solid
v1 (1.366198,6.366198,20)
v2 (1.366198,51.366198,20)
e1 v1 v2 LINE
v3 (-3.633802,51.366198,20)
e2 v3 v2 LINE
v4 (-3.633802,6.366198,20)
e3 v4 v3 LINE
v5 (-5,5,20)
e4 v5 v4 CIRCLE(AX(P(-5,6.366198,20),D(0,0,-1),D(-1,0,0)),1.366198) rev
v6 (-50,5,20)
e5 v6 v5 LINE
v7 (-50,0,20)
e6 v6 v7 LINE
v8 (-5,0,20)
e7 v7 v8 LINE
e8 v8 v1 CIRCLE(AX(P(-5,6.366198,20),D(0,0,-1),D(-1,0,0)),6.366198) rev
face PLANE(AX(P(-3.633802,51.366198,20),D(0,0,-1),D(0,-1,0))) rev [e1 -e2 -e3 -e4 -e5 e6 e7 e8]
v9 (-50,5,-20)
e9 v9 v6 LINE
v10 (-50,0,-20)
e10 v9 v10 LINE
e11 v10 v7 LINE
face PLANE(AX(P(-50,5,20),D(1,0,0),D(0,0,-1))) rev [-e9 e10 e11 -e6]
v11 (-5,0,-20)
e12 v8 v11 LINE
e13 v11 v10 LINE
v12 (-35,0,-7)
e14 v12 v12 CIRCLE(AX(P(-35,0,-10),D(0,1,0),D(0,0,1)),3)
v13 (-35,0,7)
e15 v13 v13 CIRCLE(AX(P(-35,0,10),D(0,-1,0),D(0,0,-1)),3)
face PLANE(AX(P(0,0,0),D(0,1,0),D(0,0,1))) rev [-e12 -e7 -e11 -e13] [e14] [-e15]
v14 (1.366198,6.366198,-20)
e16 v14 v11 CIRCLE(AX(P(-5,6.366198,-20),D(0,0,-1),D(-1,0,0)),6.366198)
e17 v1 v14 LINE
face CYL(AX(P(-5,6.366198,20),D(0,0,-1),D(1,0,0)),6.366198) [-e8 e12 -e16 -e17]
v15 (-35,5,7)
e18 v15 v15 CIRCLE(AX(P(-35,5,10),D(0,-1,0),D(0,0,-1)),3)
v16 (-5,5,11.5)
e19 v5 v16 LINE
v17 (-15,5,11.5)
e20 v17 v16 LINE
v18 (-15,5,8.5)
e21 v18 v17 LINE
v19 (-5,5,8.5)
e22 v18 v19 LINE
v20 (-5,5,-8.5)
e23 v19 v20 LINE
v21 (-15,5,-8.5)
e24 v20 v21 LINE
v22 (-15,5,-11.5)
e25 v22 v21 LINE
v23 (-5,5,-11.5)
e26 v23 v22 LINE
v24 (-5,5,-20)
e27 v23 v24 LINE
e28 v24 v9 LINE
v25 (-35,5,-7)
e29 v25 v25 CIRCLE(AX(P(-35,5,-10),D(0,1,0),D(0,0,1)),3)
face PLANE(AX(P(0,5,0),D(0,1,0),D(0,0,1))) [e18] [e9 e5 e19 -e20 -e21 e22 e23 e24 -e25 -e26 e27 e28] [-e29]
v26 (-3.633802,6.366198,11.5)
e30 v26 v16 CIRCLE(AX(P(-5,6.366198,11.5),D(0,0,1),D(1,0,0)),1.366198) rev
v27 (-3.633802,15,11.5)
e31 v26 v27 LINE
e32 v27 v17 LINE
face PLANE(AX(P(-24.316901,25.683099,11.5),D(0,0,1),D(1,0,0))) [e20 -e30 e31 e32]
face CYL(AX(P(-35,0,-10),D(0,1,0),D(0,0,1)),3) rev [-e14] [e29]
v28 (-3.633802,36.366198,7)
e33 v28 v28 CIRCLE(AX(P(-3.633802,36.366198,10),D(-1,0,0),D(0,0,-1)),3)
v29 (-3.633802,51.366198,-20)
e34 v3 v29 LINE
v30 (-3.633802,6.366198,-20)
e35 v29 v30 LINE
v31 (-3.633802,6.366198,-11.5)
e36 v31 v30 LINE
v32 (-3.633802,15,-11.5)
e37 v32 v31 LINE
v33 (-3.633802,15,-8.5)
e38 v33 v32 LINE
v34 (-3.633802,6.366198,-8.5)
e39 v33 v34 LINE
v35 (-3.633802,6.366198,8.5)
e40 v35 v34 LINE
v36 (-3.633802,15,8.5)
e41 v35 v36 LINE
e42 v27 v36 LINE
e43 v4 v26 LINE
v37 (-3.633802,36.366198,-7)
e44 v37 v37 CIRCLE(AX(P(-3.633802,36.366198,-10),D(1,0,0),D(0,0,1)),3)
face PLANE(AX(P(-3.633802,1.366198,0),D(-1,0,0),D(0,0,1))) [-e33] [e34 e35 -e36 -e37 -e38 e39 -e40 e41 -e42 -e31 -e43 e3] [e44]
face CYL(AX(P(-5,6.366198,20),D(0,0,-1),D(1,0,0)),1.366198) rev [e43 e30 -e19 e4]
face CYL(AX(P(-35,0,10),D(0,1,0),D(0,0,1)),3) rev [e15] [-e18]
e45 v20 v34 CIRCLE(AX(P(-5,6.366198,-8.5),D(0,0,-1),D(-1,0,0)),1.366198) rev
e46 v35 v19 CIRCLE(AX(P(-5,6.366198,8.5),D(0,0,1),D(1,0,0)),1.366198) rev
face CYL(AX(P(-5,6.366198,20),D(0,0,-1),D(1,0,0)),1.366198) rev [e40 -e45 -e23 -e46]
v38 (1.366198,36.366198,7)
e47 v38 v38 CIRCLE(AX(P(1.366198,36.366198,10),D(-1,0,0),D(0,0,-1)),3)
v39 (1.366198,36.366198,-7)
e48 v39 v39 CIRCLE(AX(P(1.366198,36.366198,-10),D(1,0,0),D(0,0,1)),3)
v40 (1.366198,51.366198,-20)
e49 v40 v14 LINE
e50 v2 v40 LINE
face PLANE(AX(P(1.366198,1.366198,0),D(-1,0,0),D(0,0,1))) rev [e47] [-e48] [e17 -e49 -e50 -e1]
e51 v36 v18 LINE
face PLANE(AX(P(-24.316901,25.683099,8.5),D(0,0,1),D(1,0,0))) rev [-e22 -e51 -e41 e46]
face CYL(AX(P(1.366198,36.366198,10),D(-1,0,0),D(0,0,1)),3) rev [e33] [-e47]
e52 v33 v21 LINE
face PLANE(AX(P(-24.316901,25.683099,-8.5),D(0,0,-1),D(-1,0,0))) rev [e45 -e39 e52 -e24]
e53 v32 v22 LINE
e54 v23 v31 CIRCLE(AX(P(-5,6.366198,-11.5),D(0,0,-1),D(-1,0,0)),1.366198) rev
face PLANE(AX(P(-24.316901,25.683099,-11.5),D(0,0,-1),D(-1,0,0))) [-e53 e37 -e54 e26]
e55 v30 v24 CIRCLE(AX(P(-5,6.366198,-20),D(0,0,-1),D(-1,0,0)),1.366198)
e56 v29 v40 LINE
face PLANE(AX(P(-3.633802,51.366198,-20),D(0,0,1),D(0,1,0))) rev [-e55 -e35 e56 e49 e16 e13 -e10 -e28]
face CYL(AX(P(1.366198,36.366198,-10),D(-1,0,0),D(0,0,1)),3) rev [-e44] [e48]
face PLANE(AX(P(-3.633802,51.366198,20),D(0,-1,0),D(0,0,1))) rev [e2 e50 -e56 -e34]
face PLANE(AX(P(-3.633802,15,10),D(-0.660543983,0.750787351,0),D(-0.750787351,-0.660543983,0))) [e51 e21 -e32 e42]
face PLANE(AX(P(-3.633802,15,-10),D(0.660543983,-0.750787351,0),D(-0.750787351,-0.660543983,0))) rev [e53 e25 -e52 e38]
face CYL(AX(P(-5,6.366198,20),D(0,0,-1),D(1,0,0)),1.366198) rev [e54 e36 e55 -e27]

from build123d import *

# Parameters (mm, degrees)
SKETCH1_W                                  = 100
SKETCH1_H                                  = 40
BOSS_EXTRUDE1_DEPTH                        = 5
SKETCH2_R                                  = 3
CUT_EXTRUDE1_DEPTH                         = 55.083269132
MIRROR1_AT_THE_SECOND_PLANE_COPY_1_SKETC_R = 3
MIRROR1_AT_THE_SECOND_PLANE_COPY_1_DEPTH   = 55.083269132
FLEX1_START                                = 1.366197724
FLEX1_OUTLINE_W                            = 5
FLEX1_OUTLINE_H                            = 40
FLEX1_DEPTH                                = 48.633802276
FLEX1_START_2                              = -3.633802276
FLEX1_2_OUTLINE_W                          = 46.366197724
FLEX1_2_OUTLINE_H                          = 40
FLEX1_2_OUTLINE_R                          = 3
FLEX1_2_DEPTH                              = 3.907802276
FLEX1_START_3                              = -5
FLEX1_3_OUTLINE_W                          = 46.366197724
FLEX1_3_OUTLINE_H                          = 40
FLEX1_3_OUTLINE_R                          = 3
FLEX1_3_DEPTH                              = 6.366197724
FLEX1_START_4                              = -20
FLEX1_4_DEPTH                              = 40
RIB1_REACH                                 = 79.708
SKETCH3_WALL_W                             = 172.55443254
SKETCH3_WALL_H                             = 3


with BuildPart() as part:
    # Sketch1 → Boss-Extrude1 (new body)
    with BuildSketch(Plane(origin=(0, 0, 0), x_dir=(1, 0, 0), z_dir=(0, 1, 0))):
        Rectangle(SKETCH1_W, SKETCH1_H)
    extrude(amount=BOSS_EXTRUDE1_DEPTH)

    # Sketch2 → Cut-Extrude1 (cut, through all)
    with BuildSketch(Plane(origin=(0, 5, 0), x_dir=(1, 0, 0), z_dir=(0, 1, 0))):
        with Locations(Location((-35, 10, 0), (0, 0, 270))):
            Circle(SKETCH2_R)
    cut_extrude1 = extrude(amount=-CUT_EXTRUDE1_DEPTH, mode=Mode.SUBTRACT)

    # Mirror1: Cut-Extrude1 across plane
    add(cut_extrude1.mirror(Plane.XY), mode=Mode.SUBTRACT)

    # Mirror1 at the second plane: Cut-Extrude1 across plane
    add(cut_extrude1.mirror(Plane(origin=(0, 0, 0), x_dir=(0, 0, 1), z_dir=(1, 0, 0))), mode=Mode.SUBTRACT)

    # Mirror1 at the second plane copy 1 sketc → Mirror1 at the second plane copy 1 (cut, through all)
    with BuildSketch(Plane(origin=(0, 5, 0), x_dir=(-1, 0, 0), z_dir=(0, 1, 0))):
        with Locations(Location((-35, 10, 0), (0, 0, 270))):
            Circle(MIRROR1_AT_THE_SECOND_PLANE_COPY_1_SKETC_R)
    extrude(amount=-MIRROR1_AT_THE_SECOND_PLANE_COPY_1_DEPTH, mode=Mode.SUBTRACT)

    # Flex1: read off the stored shape, not the designer's step
    # Flex1 outline → Flex1 (cut)
    with BuildSketch(Plane.YZ.offset(FLEX1_START)):
        with Locations((2.5, 0)):
            Rectangle(FLEX1_OUTLINE_W, FLEX1_OUTLINE_H)
    extrude(amount=FLEX1_DEPTH, mode=Mode.SUBTRACT)

    # Flex1 2 outline → Flex1 2 (add)
    with BuildSketch(Plane.YZ.offset(FLEX1_START_2)):
        with Locations((28.183098862, 0)):
            Rectangle(FLEX1_2_OUTLINE_W, FLEX1_2_OUTLINE_H)
        with Locations((36.366197724, -10)):
            Circle(FLEX1_2_OUTLINE_R, mode=Mode.SUBTRACT)
        with Locations((36.366197724, 10)):
            Circle(FLEX1_2_OUTLINE_R, mode=Mode.SUBTRACT)
    extrude(amount=FLEX1_2_DEPTH)

    # Flex1 3 outline → Flex1 3 (add)
    with BuildSketch(Plane.YZ.offset(FLEX1_START_3)):
        with Locations((28.183098862, 0)):
            Rectangle(FLEX1_3_OUTLINE_W, FLEX1_3_OUTLINE_H)
        with Locations((36.366197724, -10)):
            Circle(FLEX1_3_OUTLINE_R, mode=Mode.SUBTRACT)
        with Locations((36.366197724, 10)):
            Circle(FLEX1_3_OUTLINE_R, mode=Mode.SUBTRACT)
    extrude(amount=FLEX1_3_DEPTH)

    # Flex1 4 outline → Flex1 4 (cut)
    with BuildSketch(Plane.XY.offset(FLEX1_START_4)):
        with BuildLine():
            Line((1.366197724, 0), (1.366197724, 6.366197724))
            ThreePointArc((1.366197724, 6.366197724), (-0.498418419, 1.864616143), (-5, 0))
            Line((-5, 0), (1.366197724, 0))
        make_face()
        with BuildLine():
            ThreePointArc((-5, 5), (-4.033952325, 5.400150049), (-3.633802276, 6.366197724))
            Line((-3.633802276, 6.366197724), (-3.633802276, 51.366197724))
            Line((-3.633802276, 51.366197724), (-5, 51.366197724))
            Line((-5, 51.366197724), (-5, 5))
        make_face()
    extrude(amount=FLEX1_4_DEPTH, mode=Mode.SUBTRACT)

    # Sketch3 wall → Rib1 (add, up to next)
    with BuildSketch(Plane(origin=(-9.316901138, 10, 10), x_dir=(-0.750787351307, -0.660543982727, 0), z_dir=(0.660543982727, -0.750787351307, 0)), mode=Mode.PRIVATE) as rib1_sk1:
        Rectangle(SKETCH3_WALL_W, SKETCH3_WALL_H)
    rib1_tool1 = extrude(rib1_sk1.sketch, amount=RIB1_REACH, mode=Mode.PRIVATE) - part.part
    rib1 = rib1_tool1.solids().sort_by_distance((-9.316901138, 10, 10))[0]
    add(rib1)

    # Mirror2: Rib1 across plane
    add(rib1.mirror(Plane.XY))


solid = part.part
